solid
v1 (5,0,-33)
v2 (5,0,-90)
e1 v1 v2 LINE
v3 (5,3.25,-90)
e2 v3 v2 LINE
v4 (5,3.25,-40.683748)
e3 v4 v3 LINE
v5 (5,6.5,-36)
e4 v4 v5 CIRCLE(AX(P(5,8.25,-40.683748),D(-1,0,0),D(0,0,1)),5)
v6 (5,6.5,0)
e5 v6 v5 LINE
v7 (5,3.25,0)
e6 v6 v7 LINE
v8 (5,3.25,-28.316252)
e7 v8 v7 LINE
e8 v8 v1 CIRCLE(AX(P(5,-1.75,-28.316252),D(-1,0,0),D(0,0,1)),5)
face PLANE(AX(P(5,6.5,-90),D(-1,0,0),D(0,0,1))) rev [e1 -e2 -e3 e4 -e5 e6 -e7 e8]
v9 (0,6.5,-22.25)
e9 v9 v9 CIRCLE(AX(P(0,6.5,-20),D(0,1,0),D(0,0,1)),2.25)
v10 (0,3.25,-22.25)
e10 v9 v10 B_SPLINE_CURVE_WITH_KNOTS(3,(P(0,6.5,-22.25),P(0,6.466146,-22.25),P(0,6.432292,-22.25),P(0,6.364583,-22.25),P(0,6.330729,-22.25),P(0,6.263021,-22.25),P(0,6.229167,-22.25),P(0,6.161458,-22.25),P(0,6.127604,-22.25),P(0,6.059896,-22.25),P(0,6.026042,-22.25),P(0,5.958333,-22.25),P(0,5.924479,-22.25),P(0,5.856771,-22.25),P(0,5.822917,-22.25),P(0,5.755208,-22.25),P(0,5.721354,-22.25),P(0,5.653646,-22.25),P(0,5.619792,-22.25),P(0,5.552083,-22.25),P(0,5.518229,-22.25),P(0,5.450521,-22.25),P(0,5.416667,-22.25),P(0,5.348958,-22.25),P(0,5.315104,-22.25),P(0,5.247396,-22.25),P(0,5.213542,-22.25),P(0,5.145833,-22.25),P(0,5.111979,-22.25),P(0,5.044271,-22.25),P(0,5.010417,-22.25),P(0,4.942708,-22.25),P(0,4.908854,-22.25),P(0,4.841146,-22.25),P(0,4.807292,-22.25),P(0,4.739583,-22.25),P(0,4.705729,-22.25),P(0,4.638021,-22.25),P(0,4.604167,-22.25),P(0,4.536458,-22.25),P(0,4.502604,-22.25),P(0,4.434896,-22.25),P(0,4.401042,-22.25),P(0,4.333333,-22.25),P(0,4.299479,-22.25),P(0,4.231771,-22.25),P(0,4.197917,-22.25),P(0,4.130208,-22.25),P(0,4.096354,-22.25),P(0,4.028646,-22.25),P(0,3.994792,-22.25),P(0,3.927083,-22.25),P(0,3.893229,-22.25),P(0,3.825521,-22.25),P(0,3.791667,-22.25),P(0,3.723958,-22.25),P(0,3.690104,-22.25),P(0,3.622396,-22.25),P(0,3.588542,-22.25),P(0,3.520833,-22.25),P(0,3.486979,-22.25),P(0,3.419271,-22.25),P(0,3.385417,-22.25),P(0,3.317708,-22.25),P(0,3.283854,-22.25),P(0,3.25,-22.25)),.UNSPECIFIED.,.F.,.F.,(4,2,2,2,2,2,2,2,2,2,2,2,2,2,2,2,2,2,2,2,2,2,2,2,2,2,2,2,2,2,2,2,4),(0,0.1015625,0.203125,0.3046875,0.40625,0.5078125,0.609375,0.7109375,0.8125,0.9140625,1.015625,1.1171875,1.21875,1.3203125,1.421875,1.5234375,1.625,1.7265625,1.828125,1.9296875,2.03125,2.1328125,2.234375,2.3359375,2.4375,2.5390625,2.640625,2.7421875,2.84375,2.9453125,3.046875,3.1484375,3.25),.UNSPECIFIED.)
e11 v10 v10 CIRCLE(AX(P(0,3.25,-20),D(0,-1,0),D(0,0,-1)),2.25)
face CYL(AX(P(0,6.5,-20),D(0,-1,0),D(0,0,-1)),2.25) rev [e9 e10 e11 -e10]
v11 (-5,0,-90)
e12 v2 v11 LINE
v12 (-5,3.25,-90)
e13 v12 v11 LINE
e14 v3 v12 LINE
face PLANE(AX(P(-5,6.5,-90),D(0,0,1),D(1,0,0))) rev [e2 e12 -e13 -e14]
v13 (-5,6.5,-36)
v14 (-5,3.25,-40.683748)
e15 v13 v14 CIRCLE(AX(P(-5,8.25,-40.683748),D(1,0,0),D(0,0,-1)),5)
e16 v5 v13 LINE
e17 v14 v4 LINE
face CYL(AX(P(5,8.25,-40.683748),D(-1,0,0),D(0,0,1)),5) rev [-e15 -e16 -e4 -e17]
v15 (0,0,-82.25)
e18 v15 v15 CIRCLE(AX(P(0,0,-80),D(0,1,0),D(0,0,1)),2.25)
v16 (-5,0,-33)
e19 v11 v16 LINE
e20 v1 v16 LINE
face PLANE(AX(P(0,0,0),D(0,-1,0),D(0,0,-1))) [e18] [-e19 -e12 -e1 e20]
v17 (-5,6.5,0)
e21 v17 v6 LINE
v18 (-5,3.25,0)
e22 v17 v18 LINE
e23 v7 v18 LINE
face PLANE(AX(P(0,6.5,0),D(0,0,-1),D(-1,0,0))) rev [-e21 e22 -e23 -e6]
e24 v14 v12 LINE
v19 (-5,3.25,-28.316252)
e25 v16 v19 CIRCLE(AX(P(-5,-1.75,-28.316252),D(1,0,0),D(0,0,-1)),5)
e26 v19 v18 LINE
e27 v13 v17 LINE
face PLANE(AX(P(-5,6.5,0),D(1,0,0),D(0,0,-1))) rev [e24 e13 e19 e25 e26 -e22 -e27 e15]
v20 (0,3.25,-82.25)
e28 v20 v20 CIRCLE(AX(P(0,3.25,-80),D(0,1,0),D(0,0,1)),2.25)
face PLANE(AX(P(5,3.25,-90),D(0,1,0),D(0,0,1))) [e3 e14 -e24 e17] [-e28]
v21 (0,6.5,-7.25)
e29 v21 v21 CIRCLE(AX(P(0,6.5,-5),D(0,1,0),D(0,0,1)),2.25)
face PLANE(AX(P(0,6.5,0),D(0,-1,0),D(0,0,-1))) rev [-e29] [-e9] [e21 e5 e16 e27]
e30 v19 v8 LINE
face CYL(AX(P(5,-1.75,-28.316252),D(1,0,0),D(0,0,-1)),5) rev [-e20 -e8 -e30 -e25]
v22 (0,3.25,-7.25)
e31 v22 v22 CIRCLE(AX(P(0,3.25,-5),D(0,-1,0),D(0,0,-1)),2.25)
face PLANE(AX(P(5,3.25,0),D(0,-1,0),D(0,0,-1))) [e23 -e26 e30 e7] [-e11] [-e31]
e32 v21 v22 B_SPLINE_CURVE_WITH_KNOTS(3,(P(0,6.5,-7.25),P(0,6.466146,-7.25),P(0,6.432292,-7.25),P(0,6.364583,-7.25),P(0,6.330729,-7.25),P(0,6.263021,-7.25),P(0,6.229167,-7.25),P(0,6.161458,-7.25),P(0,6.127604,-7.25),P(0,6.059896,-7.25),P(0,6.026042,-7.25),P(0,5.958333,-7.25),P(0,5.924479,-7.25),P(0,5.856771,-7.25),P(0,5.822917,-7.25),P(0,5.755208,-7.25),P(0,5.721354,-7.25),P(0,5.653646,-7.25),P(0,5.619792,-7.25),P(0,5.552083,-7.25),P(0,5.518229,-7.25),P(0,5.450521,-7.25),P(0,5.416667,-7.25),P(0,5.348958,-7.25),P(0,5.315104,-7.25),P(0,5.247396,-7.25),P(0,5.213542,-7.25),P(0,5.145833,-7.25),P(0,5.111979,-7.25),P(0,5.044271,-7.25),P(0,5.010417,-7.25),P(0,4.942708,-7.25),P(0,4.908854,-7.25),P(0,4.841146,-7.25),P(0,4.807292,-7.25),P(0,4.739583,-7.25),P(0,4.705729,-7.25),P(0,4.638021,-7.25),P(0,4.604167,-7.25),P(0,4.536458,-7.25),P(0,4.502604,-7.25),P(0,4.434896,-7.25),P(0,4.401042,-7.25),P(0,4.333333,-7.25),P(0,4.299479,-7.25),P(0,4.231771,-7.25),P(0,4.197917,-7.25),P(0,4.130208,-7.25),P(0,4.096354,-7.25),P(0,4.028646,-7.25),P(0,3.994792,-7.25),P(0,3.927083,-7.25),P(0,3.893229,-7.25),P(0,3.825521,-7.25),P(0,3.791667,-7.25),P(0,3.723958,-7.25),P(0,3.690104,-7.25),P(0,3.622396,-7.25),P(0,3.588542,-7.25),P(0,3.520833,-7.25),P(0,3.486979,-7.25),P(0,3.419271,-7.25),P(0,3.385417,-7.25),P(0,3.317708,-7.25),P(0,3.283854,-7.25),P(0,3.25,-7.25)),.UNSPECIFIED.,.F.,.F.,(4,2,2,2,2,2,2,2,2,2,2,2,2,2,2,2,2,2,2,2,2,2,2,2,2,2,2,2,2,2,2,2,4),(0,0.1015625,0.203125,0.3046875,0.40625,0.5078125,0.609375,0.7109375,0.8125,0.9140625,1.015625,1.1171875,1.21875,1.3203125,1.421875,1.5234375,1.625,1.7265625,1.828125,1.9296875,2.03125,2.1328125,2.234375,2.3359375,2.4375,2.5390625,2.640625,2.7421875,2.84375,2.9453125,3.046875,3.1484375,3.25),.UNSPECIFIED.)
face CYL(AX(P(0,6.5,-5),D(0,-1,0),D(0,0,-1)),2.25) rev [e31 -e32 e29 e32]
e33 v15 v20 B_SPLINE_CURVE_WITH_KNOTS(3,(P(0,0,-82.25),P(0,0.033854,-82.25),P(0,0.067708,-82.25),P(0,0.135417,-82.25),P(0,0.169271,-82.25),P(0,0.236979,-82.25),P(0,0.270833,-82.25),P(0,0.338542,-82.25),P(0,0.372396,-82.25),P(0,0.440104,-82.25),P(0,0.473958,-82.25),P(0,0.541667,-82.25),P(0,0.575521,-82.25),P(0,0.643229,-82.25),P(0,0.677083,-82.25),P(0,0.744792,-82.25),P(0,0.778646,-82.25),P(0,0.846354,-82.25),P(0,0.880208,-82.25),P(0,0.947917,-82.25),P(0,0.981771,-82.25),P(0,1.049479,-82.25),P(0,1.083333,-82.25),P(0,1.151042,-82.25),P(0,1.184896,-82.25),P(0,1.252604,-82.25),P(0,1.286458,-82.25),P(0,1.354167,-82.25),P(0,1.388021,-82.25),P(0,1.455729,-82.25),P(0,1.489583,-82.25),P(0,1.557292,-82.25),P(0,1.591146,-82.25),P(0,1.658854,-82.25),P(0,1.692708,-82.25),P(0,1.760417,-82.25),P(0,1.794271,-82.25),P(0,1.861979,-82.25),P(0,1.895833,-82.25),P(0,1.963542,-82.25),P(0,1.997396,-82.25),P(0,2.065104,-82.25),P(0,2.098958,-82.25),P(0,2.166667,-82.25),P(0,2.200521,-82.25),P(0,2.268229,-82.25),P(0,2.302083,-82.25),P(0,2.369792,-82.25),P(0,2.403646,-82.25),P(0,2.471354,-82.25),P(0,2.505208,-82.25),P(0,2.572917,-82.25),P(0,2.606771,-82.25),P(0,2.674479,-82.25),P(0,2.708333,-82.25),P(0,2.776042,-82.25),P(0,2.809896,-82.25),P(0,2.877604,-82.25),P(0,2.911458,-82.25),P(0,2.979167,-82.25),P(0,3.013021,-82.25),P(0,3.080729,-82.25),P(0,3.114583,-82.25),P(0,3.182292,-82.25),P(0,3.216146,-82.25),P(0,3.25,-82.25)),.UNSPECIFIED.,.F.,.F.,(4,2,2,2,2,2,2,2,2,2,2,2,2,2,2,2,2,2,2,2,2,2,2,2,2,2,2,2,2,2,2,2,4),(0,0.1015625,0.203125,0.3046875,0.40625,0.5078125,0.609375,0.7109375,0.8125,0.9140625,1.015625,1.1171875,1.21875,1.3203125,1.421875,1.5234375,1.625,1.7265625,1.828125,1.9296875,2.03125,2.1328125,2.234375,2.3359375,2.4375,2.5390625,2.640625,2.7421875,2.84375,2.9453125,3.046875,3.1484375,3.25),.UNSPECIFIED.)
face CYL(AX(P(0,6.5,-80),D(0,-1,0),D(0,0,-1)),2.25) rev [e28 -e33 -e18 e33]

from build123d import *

# Parameters (mm, degrees)
SKETCH1_R               = 2.25
BOSS_EXTRUDE1_DEPTH     = 6.5
CUT_EXTRUDE1_DEPTH      = 5
CUT_EXTRUDE1_DEPTH_BACK = 5
SKETCH2_W               = 33
SKETCH2_H               = 3.25
SKETCH2_W_2             = 54
FILLET1_R               = 5


with BuildPart() as part:
    # Sketch1 → Boss-Extrude1 (new body)
    with BuildSketch(Plane(origin=(0, 0, 0), x_dir=(1, 0, 0), z_dir=(0, 1, 0))):
        Polygon((0, 0), (-5, 0), (-5, 90), (5, 90), (5, 0), align=None)
        with Locations(Location((0, 20, 0), (0, 0, 90))):
            Circle(SKETCH1_R, mode=Mode.SUBTRACT)
        with Locations(Location((0, 5, 0), (0, 0, 90))):
            Circle(SKETCH1_R, mode=Mode.SUBTRACT)
        with Locations(Location((0, 80, 0), (0, 0, 90))):
            Circle(SKETCH1_R, mode=Mode.SUBTRACT)
    extrude(amount=BOSS_EXTRUDE1_DEPTH)

    # Sketch2 → Cut-Extrude1 (cut, two sides: drawn at the far end of the back side and taken through both)
    with BuildSketch(Plane(origin=(0, 0, 0), x_dir=(0, 0, -1), z_dir=(1, 0, 0)).offset(-CUT_EXTRUDE1_DEPTH_BACK)):
        with Locations((16.5, 1.625)):
            Rectangle(SKETCH2_W, SKETCH2_H)
        with Locations((63, 4.875)):
            Rectangle(SKETCH2_W_2, SKETCH2_H)
    extrude(amount=CUT_EXTRUDE1_DEPTH + CUT_EXTRUDE1_DEPTH_BACK, mode=Mode.SUBTRACT)

    # Fillet1
    # the kernel refuses this fillet: 5 mm, written as the material it adds along each edge
    with BuildSketch(Plane(origin=(5, 3.25, -33), x_dir=(0, 0, 1), z_dir=(-1, 0, 0))) as fillet1_piece_1:
        with BuildLine():
            CenterArc((4.683748499, -5), FILLET1_R, 90, 69.512684885)
            Line((0, -3.25), (-0.09367497, -3.215))
            ThreePointArc((-0.09367497, -3.215), (-0.1, -1.625), (-0.1, 0))
            Line((-0.1, 0), (0, 0.1))
            Line((0, 0.1), (4.683748499, 0.1))
            Line((4.683748499, 0.1), (4.683748499, 0))
        make_face()
    extrude(amount=10)
    with BuildSketch(Plane(origin=(-5, 3.25, -36), x_dir=(0, 0, -1), z_dir=(1, 0, 0))) as fillet1_piece_2:
        with BuildLine():
            CenterArc((4.683748499, 5), FILLET1_R, 200.487315115, 69.512684885)
            Line((0, 3.25), (-0.09367497, 3.215))
            ThreePointArc((-0.09367497, 3.215), (-0.1, 1.625), (-0.1, 0))
            Line((-0.1, 0), (0, -0.1))
            Line((0, -0.1), (4.683748499, -0.1))
            Line((4.683748499, -0.1), (4.683748499, 0))
        make_face()
    extrude(amount=10)


solid = part.part
